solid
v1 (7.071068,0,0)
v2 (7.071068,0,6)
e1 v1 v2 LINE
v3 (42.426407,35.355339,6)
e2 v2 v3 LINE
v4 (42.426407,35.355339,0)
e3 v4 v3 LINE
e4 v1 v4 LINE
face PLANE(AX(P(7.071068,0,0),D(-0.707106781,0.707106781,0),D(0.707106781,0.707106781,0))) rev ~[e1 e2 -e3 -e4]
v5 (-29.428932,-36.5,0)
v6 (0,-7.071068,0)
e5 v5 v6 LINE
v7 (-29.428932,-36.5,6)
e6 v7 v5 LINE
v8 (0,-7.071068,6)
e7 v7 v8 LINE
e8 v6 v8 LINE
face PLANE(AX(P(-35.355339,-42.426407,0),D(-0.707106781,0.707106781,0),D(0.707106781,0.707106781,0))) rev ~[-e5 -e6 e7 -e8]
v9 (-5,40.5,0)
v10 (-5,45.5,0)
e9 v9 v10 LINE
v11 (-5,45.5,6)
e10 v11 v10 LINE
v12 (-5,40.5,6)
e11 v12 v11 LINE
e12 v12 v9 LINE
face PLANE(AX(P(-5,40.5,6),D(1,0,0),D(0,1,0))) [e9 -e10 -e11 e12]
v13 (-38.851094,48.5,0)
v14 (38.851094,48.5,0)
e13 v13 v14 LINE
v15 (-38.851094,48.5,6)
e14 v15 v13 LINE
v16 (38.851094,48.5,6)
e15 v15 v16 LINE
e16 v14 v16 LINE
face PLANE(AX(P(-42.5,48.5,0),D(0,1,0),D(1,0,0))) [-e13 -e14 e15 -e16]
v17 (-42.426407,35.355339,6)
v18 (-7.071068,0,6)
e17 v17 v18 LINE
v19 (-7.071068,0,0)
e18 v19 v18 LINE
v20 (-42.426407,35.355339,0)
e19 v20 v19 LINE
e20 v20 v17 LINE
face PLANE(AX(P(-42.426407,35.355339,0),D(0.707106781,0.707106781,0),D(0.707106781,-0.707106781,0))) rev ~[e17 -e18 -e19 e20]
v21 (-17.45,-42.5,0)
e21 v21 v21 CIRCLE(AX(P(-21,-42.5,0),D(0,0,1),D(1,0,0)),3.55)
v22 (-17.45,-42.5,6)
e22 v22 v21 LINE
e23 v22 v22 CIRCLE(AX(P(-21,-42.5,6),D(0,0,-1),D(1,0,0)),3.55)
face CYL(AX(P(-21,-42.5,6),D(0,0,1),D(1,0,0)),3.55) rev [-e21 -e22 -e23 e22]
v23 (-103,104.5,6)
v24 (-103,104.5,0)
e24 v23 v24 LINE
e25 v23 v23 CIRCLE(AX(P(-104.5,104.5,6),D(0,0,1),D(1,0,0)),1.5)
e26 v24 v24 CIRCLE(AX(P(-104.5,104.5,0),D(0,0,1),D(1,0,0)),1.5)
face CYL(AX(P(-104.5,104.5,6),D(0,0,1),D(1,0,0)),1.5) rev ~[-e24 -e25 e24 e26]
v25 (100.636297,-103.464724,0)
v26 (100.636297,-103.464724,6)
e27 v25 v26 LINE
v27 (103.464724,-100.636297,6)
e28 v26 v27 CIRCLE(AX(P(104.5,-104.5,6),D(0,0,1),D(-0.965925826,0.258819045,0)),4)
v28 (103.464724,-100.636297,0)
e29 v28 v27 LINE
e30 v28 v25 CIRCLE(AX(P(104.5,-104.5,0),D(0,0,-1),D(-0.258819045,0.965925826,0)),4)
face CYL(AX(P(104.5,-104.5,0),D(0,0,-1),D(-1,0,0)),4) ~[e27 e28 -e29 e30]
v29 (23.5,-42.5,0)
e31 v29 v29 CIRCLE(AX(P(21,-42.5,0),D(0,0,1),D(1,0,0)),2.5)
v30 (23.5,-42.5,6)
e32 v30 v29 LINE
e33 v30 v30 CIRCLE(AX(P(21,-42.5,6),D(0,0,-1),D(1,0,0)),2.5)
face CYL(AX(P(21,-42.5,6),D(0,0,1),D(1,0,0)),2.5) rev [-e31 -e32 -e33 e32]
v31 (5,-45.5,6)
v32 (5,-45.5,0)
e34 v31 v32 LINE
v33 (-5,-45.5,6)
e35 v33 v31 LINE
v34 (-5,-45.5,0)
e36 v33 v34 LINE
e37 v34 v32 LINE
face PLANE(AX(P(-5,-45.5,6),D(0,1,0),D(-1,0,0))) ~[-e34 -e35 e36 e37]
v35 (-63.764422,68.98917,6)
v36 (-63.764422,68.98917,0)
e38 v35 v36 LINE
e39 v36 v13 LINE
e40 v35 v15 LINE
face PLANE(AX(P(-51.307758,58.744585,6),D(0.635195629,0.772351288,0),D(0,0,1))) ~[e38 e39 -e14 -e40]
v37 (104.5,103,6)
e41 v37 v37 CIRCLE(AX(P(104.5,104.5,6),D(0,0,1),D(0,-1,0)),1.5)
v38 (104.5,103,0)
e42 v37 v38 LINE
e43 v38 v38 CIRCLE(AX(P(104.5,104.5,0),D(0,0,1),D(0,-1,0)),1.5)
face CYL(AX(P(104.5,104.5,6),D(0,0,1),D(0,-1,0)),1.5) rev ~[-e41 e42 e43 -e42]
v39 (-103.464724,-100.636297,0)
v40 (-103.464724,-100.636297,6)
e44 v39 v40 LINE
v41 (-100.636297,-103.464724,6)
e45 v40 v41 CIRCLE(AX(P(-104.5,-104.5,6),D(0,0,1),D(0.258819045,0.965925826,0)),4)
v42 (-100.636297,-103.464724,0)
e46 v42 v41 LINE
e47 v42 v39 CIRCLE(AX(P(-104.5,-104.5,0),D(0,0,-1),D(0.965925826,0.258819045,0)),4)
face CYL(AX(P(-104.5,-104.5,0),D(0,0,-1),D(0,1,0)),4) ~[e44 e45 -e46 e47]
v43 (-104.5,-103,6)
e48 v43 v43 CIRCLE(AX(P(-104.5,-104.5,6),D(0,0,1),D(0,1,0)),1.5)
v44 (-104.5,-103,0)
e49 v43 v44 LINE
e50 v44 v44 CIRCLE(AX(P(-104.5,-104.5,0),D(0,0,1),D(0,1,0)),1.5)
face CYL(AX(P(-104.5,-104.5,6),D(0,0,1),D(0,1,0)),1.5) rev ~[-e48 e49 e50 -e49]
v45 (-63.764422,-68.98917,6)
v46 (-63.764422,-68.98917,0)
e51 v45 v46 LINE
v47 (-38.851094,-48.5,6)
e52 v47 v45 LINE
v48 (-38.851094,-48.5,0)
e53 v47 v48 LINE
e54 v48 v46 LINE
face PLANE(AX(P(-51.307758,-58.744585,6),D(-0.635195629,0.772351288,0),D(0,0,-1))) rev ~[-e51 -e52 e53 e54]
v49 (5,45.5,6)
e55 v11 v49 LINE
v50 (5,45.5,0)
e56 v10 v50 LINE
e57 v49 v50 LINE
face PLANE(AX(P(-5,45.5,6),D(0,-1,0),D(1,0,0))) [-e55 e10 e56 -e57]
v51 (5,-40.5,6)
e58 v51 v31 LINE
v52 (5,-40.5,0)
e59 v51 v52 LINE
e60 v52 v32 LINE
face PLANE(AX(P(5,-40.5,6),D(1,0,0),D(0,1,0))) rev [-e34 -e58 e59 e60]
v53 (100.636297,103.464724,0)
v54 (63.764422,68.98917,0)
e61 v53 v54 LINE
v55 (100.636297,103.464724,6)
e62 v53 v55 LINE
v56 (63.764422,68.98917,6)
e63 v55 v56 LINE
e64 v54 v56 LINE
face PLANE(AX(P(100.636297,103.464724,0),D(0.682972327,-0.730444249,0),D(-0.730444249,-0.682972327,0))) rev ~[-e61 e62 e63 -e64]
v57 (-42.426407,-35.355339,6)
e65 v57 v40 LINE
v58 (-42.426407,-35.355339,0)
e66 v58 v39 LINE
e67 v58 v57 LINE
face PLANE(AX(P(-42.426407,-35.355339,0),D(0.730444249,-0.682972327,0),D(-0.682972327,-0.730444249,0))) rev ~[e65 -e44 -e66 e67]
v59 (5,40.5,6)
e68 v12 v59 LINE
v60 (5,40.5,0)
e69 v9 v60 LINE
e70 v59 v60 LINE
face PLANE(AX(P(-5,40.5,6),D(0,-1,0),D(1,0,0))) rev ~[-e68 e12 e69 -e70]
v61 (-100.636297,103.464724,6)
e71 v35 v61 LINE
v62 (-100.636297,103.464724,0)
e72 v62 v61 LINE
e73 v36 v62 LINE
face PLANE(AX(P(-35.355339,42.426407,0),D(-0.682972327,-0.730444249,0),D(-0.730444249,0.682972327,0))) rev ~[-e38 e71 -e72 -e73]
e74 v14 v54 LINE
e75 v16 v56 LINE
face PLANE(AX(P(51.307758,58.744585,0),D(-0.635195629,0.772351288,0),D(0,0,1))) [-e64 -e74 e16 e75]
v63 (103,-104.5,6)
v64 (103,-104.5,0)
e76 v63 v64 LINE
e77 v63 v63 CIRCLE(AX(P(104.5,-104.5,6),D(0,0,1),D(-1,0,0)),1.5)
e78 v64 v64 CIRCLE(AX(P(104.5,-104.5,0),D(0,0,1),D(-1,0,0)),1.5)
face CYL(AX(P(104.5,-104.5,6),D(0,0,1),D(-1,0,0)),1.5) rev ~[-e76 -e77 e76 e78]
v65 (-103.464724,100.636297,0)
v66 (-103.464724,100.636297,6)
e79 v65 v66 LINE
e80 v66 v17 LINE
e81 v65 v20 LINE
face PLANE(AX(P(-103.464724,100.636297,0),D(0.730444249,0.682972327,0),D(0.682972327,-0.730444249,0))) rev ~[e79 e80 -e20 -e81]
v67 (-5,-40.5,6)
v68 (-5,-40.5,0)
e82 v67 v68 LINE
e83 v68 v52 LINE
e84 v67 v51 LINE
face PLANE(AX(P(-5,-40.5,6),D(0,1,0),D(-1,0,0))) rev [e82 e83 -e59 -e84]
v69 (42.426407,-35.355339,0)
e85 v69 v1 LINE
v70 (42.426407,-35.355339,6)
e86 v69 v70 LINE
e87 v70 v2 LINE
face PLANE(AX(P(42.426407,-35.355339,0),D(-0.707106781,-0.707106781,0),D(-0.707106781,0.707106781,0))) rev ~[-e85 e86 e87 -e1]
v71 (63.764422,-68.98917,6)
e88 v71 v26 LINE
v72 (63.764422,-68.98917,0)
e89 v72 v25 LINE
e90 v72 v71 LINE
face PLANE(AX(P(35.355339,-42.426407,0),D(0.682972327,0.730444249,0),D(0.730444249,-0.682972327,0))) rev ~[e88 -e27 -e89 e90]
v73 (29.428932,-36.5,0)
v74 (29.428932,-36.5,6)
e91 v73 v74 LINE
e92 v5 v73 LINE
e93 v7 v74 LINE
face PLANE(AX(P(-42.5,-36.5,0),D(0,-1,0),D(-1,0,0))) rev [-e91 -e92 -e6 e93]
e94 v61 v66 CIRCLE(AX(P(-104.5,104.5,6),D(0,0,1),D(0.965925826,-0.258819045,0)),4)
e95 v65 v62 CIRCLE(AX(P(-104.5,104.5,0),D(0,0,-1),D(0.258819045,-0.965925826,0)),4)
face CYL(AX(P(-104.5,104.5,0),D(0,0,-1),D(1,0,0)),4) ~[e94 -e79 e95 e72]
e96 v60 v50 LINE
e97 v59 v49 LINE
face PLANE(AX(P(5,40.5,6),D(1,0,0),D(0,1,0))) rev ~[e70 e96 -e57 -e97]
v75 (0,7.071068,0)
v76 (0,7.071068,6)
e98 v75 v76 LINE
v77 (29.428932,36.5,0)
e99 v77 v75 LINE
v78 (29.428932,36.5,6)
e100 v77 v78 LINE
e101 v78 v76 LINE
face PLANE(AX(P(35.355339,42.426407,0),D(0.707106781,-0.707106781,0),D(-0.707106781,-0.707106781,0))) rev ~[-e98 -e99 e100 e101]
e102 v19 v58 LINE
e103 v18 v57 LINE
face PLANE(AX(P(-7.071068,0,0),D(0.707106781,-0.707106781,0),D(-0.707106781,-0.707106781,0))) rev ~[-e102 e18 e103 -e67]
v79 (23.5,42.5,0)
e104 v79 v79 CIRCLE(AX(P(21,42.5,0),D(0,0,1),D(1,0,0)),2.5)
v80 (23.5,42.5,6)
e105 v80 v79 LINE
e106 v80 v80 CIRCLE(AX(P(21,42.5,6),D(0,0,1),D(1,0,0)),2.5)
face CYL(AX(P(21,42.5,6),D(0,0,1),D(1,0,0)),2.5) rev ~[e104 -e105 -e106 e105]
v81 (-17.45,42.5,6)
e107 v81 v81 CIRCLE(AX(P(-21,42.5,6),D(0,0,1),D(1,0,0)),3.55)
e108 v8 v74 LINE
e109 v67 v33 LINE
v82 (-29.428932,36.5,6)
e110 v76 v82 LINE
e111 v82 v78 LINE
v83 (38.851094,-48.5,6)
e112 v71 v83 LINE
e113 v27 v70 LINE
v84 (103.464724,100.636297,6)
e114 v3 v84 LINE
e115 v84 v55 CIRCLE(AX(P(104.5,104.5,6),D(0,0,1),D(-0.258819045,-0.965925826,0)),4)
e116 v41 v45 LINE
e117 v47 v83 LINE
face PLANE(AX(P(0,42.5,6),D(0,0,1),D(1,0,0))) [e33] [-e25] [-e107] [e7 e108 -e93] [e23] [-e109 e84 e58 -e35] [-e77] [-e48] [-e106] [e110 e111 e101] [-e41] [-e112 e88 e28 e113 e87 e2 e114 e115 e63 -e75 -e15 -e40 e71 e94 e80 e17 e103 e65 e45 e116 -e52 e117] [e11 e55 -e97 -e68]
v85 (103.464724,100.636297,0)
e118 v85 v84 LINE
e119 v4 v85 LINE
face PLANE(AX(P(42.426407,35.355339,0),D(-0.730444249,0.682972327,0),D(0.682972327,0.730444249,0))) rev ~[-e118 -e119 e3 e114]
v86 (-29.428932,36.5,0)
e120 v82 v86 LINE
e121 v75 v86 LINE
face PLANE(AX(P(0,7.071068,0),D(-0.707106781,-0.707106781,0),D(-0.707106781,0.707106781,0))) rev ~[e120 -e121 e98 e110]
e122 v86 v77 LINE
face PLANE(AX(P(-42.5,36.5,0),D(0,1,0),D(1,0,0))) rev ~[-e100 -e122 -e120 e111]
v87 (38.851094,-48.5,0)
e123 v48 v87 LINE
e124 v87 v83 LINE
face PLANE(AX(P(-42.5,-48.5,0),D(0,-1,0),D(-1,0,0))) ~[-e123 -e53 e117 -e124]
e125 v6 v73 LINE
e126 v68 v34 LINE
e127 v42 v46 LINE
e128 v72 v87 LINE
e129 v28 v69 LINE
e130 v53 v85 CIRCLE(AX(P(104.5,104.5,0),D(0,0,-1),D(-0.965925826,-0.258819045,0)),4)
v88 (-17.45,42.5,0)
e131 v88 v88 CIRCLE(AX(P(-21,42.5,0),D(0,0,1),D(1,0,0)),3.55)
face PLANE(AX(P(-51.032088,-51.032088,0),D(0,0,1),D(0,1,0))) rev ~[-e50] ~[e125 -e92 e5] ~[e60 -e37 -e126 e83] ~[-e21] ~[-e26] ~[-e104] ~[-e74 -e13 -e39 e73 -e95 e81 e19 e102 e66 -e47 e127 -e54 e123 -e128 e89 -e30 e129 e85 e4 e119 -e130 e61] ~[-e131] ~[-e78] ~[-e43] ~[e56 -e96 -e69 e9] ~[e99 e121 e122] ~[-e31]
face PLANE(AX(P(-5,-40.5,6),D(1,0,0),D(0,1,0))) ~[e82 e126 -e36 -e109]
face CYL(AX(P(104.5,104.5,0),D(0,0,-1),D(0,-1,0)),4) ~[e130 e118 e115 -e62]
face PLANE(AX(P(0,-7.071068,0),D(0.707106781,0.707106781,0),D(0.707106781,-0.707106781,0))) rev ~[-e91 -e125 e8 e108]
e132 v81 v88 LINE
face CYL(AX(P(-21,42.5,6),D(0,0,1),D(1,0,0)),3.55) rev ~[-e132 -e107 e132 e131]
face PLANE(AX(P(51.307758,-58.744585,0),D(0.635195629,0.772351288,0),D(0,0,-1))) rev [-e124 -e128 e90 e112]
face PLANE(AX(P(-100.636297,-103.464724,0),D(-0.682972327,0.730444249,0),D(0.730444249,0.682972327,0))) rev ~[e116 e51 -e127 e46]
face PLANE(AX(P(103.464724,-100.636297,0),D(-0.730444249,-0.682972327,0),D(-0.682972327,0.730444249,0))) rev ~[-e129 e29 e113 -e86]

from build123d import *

# Parameters (mm, degrees)
F0_R         = 4
F1_DEPTH     = 6
F3_DEPTH     = 6
F4_R         = 1.5
F5_DEPTH     = 6.001
F6_COUNT     = 4
F8_W         = 85
F8_H         = 12
F9_DEPTH     = 6
F10_R        = 3.55
F10_R_2      = 2.5
F10_W        = 10
F10_H        = 5
F11_DEPTH    = 6.001
F12_C1_SIZE2 = 3
F12_C1_SIZE  = 30
F12_C2_SIZE2 = 30
F12_C2_SIZE  = 3
F12_C3_SIZE2 = 3
F12_C3_SIZE  = 30
F12_C4_SIZE2 = 30
F12_C4_SIZE  = 3


# Not quite as in the source:
# - a pattern or mirror of a feature is missing from the dataset's text; its kind, count and spacing are read off the source's solid


with BuildPart() as f1:
    # F0 (on Top) → F1 (new body)
    with BuildSketch(Plane.XY):
        with Locations((-104.5, 104.5)):
            Circle(F0_R)
    extrude(amount=F1_DEPTH)

    # F2 (on Top) → F3 (join, through all)
    with BuildSketch(Plane.XY):
        Polygon((-7.0710678119, 0), (0, 0), (0, 7.0710678119), (-35.3553390593, 42.4264068712), (-100.6362966948, 103.4647238196), (-103.4647238196, 100.6362966948), (-42.4264068712, 35.3553390593), align=None)
    extrude(amount=F3_DEPTH)

    # F4 (on face) → F5 (cut, through all)
    with BuildSketch(Plane.XY.offset(6)):
        with Locations((-104.5, 104.5)):
            Circle(F4_R)
    extrude(amount=-F5_DEPTH, mode=Mode.SUBTRACT)


with BuildPart() as f6_1:
    # F6: instance of F1
    add(f1.part.rotate(Axis((0, 0, 3), (0, 0, -1)), 1 * 360 / F6_COUNT))


with BuildPart() as f6_2:
    # F6: instance of F1
    add(f1.part.rotate(Axis((0, 0, 3), (0, 0, -1)), 2 * 360 / F6_COUNT))


with BuildPart() as f6_3:
    # F6: instance of F1
    add(f1.part.rotate(Axis((0, 0, 3), (0, 0, -1)), 3 * 360 / F6_COUNT))


with BuildPart() as f1_1:
    add(f1.part)

    # F7: union F6_1, F6_2, F6_3
    add(f6_1.part)
    add(f6_2.part)
    add(f6_3.part)

    # F8 (on Top) → F9 (join, through all)
    with BuildSketch(Plane.XY):
        with Locations((0, 42.5)):
            Rectangle(F8_W, F8_H)
    f9 = extrude(amount=F9_DEPTH)

    # F9_copies: F9 across plane
    add(f9.mirror(Plane(origin=(0, 0, 0), x_dir=(0, 0, -1), z_dir=(0, -1, 0))))

    # F10 (on face) → F11 (cut, through all)
    with BuildSketch(Plane.XY.offset(6)):
        with Locations((-21, 42.5)):
            Circle(F10_R)
        with Locations((21, 42.5)):
            Circle(F10_R_2)
        with Locations((0, 43)):
            Rectangle(F10_W, F10_H)
    f11 = extrude(amount=-F11_DEPTH, mode=Mode.SUBTRACT)

    # F11_copies: F11 across plane
    add(f11.mirror(Plane(origin=(0, 0, 0), x_dir=(0, 0, -1), z_dir=(0, -1, 0))), mode=Mode.SUBTRACT)

    # F12: chamfer of 3 x 30 on 4 edges, made by hand

    # F12_c1
    f12_c1_edges = [f1_1.edges().sort_by_distance(p)[0] for p in [
        (-41.8510944399, 48.5, 3),
    ]]
    f12_c1_side = f1_1.faces().sort_by_distance((-41.8949210948, 48.5409783396, 3))[0]
    chamfer(f12_c1_edges, length=F12_C1_SIZE, length2=F12_C1_SIZE2, reference=f12_c1_side)

    # F12_c2
    f12_c2_edges = [f1_1.edges().sort_by_distance(p)[0] for p in [
        (41.8510944399, 48.5, 3),
    ]]
    f12_c2_side = f1_1.faces().sort_by_distance((41.7910944399, 48.5, 3))[0]
    chamfer(f12_c2_edges, length=F12_C2_SIZE, length2=F12_C2_SIZE2, reference=f12_c2_side)

    # F12_c3
    f12_c3_edges = [f1_1.edges().sort_by_distance(p)[0] for p in [
        (41.8510944399, -48.5, 3),
    ]]
    f12_c3_side = f1_1.faces().sort_by_distance((41.8949210948, -48.5409783396, 3))[0]
    chamfer(f12_c3_edges, length=F12_C3_SIZE, length2=F12_C3_SIZE2, reference=f12_c3_side)

    # F12_c4
    f12_c4_edges = [f1_1.edges().sort_by_distance(p)[0] for p in [
        (-41.8510944399, -48.5, 3),
    ]]
    f12_c4_side = f1_1.faces().sort_by_distance((-41.7910944399, -48.5, 3))[0]
    chamfer(f12_c4_edges, length=F12_C4_SIZE, length2=F12_C4_SIZE2, reference=f12_c4_side)


solid = f1_1.part
